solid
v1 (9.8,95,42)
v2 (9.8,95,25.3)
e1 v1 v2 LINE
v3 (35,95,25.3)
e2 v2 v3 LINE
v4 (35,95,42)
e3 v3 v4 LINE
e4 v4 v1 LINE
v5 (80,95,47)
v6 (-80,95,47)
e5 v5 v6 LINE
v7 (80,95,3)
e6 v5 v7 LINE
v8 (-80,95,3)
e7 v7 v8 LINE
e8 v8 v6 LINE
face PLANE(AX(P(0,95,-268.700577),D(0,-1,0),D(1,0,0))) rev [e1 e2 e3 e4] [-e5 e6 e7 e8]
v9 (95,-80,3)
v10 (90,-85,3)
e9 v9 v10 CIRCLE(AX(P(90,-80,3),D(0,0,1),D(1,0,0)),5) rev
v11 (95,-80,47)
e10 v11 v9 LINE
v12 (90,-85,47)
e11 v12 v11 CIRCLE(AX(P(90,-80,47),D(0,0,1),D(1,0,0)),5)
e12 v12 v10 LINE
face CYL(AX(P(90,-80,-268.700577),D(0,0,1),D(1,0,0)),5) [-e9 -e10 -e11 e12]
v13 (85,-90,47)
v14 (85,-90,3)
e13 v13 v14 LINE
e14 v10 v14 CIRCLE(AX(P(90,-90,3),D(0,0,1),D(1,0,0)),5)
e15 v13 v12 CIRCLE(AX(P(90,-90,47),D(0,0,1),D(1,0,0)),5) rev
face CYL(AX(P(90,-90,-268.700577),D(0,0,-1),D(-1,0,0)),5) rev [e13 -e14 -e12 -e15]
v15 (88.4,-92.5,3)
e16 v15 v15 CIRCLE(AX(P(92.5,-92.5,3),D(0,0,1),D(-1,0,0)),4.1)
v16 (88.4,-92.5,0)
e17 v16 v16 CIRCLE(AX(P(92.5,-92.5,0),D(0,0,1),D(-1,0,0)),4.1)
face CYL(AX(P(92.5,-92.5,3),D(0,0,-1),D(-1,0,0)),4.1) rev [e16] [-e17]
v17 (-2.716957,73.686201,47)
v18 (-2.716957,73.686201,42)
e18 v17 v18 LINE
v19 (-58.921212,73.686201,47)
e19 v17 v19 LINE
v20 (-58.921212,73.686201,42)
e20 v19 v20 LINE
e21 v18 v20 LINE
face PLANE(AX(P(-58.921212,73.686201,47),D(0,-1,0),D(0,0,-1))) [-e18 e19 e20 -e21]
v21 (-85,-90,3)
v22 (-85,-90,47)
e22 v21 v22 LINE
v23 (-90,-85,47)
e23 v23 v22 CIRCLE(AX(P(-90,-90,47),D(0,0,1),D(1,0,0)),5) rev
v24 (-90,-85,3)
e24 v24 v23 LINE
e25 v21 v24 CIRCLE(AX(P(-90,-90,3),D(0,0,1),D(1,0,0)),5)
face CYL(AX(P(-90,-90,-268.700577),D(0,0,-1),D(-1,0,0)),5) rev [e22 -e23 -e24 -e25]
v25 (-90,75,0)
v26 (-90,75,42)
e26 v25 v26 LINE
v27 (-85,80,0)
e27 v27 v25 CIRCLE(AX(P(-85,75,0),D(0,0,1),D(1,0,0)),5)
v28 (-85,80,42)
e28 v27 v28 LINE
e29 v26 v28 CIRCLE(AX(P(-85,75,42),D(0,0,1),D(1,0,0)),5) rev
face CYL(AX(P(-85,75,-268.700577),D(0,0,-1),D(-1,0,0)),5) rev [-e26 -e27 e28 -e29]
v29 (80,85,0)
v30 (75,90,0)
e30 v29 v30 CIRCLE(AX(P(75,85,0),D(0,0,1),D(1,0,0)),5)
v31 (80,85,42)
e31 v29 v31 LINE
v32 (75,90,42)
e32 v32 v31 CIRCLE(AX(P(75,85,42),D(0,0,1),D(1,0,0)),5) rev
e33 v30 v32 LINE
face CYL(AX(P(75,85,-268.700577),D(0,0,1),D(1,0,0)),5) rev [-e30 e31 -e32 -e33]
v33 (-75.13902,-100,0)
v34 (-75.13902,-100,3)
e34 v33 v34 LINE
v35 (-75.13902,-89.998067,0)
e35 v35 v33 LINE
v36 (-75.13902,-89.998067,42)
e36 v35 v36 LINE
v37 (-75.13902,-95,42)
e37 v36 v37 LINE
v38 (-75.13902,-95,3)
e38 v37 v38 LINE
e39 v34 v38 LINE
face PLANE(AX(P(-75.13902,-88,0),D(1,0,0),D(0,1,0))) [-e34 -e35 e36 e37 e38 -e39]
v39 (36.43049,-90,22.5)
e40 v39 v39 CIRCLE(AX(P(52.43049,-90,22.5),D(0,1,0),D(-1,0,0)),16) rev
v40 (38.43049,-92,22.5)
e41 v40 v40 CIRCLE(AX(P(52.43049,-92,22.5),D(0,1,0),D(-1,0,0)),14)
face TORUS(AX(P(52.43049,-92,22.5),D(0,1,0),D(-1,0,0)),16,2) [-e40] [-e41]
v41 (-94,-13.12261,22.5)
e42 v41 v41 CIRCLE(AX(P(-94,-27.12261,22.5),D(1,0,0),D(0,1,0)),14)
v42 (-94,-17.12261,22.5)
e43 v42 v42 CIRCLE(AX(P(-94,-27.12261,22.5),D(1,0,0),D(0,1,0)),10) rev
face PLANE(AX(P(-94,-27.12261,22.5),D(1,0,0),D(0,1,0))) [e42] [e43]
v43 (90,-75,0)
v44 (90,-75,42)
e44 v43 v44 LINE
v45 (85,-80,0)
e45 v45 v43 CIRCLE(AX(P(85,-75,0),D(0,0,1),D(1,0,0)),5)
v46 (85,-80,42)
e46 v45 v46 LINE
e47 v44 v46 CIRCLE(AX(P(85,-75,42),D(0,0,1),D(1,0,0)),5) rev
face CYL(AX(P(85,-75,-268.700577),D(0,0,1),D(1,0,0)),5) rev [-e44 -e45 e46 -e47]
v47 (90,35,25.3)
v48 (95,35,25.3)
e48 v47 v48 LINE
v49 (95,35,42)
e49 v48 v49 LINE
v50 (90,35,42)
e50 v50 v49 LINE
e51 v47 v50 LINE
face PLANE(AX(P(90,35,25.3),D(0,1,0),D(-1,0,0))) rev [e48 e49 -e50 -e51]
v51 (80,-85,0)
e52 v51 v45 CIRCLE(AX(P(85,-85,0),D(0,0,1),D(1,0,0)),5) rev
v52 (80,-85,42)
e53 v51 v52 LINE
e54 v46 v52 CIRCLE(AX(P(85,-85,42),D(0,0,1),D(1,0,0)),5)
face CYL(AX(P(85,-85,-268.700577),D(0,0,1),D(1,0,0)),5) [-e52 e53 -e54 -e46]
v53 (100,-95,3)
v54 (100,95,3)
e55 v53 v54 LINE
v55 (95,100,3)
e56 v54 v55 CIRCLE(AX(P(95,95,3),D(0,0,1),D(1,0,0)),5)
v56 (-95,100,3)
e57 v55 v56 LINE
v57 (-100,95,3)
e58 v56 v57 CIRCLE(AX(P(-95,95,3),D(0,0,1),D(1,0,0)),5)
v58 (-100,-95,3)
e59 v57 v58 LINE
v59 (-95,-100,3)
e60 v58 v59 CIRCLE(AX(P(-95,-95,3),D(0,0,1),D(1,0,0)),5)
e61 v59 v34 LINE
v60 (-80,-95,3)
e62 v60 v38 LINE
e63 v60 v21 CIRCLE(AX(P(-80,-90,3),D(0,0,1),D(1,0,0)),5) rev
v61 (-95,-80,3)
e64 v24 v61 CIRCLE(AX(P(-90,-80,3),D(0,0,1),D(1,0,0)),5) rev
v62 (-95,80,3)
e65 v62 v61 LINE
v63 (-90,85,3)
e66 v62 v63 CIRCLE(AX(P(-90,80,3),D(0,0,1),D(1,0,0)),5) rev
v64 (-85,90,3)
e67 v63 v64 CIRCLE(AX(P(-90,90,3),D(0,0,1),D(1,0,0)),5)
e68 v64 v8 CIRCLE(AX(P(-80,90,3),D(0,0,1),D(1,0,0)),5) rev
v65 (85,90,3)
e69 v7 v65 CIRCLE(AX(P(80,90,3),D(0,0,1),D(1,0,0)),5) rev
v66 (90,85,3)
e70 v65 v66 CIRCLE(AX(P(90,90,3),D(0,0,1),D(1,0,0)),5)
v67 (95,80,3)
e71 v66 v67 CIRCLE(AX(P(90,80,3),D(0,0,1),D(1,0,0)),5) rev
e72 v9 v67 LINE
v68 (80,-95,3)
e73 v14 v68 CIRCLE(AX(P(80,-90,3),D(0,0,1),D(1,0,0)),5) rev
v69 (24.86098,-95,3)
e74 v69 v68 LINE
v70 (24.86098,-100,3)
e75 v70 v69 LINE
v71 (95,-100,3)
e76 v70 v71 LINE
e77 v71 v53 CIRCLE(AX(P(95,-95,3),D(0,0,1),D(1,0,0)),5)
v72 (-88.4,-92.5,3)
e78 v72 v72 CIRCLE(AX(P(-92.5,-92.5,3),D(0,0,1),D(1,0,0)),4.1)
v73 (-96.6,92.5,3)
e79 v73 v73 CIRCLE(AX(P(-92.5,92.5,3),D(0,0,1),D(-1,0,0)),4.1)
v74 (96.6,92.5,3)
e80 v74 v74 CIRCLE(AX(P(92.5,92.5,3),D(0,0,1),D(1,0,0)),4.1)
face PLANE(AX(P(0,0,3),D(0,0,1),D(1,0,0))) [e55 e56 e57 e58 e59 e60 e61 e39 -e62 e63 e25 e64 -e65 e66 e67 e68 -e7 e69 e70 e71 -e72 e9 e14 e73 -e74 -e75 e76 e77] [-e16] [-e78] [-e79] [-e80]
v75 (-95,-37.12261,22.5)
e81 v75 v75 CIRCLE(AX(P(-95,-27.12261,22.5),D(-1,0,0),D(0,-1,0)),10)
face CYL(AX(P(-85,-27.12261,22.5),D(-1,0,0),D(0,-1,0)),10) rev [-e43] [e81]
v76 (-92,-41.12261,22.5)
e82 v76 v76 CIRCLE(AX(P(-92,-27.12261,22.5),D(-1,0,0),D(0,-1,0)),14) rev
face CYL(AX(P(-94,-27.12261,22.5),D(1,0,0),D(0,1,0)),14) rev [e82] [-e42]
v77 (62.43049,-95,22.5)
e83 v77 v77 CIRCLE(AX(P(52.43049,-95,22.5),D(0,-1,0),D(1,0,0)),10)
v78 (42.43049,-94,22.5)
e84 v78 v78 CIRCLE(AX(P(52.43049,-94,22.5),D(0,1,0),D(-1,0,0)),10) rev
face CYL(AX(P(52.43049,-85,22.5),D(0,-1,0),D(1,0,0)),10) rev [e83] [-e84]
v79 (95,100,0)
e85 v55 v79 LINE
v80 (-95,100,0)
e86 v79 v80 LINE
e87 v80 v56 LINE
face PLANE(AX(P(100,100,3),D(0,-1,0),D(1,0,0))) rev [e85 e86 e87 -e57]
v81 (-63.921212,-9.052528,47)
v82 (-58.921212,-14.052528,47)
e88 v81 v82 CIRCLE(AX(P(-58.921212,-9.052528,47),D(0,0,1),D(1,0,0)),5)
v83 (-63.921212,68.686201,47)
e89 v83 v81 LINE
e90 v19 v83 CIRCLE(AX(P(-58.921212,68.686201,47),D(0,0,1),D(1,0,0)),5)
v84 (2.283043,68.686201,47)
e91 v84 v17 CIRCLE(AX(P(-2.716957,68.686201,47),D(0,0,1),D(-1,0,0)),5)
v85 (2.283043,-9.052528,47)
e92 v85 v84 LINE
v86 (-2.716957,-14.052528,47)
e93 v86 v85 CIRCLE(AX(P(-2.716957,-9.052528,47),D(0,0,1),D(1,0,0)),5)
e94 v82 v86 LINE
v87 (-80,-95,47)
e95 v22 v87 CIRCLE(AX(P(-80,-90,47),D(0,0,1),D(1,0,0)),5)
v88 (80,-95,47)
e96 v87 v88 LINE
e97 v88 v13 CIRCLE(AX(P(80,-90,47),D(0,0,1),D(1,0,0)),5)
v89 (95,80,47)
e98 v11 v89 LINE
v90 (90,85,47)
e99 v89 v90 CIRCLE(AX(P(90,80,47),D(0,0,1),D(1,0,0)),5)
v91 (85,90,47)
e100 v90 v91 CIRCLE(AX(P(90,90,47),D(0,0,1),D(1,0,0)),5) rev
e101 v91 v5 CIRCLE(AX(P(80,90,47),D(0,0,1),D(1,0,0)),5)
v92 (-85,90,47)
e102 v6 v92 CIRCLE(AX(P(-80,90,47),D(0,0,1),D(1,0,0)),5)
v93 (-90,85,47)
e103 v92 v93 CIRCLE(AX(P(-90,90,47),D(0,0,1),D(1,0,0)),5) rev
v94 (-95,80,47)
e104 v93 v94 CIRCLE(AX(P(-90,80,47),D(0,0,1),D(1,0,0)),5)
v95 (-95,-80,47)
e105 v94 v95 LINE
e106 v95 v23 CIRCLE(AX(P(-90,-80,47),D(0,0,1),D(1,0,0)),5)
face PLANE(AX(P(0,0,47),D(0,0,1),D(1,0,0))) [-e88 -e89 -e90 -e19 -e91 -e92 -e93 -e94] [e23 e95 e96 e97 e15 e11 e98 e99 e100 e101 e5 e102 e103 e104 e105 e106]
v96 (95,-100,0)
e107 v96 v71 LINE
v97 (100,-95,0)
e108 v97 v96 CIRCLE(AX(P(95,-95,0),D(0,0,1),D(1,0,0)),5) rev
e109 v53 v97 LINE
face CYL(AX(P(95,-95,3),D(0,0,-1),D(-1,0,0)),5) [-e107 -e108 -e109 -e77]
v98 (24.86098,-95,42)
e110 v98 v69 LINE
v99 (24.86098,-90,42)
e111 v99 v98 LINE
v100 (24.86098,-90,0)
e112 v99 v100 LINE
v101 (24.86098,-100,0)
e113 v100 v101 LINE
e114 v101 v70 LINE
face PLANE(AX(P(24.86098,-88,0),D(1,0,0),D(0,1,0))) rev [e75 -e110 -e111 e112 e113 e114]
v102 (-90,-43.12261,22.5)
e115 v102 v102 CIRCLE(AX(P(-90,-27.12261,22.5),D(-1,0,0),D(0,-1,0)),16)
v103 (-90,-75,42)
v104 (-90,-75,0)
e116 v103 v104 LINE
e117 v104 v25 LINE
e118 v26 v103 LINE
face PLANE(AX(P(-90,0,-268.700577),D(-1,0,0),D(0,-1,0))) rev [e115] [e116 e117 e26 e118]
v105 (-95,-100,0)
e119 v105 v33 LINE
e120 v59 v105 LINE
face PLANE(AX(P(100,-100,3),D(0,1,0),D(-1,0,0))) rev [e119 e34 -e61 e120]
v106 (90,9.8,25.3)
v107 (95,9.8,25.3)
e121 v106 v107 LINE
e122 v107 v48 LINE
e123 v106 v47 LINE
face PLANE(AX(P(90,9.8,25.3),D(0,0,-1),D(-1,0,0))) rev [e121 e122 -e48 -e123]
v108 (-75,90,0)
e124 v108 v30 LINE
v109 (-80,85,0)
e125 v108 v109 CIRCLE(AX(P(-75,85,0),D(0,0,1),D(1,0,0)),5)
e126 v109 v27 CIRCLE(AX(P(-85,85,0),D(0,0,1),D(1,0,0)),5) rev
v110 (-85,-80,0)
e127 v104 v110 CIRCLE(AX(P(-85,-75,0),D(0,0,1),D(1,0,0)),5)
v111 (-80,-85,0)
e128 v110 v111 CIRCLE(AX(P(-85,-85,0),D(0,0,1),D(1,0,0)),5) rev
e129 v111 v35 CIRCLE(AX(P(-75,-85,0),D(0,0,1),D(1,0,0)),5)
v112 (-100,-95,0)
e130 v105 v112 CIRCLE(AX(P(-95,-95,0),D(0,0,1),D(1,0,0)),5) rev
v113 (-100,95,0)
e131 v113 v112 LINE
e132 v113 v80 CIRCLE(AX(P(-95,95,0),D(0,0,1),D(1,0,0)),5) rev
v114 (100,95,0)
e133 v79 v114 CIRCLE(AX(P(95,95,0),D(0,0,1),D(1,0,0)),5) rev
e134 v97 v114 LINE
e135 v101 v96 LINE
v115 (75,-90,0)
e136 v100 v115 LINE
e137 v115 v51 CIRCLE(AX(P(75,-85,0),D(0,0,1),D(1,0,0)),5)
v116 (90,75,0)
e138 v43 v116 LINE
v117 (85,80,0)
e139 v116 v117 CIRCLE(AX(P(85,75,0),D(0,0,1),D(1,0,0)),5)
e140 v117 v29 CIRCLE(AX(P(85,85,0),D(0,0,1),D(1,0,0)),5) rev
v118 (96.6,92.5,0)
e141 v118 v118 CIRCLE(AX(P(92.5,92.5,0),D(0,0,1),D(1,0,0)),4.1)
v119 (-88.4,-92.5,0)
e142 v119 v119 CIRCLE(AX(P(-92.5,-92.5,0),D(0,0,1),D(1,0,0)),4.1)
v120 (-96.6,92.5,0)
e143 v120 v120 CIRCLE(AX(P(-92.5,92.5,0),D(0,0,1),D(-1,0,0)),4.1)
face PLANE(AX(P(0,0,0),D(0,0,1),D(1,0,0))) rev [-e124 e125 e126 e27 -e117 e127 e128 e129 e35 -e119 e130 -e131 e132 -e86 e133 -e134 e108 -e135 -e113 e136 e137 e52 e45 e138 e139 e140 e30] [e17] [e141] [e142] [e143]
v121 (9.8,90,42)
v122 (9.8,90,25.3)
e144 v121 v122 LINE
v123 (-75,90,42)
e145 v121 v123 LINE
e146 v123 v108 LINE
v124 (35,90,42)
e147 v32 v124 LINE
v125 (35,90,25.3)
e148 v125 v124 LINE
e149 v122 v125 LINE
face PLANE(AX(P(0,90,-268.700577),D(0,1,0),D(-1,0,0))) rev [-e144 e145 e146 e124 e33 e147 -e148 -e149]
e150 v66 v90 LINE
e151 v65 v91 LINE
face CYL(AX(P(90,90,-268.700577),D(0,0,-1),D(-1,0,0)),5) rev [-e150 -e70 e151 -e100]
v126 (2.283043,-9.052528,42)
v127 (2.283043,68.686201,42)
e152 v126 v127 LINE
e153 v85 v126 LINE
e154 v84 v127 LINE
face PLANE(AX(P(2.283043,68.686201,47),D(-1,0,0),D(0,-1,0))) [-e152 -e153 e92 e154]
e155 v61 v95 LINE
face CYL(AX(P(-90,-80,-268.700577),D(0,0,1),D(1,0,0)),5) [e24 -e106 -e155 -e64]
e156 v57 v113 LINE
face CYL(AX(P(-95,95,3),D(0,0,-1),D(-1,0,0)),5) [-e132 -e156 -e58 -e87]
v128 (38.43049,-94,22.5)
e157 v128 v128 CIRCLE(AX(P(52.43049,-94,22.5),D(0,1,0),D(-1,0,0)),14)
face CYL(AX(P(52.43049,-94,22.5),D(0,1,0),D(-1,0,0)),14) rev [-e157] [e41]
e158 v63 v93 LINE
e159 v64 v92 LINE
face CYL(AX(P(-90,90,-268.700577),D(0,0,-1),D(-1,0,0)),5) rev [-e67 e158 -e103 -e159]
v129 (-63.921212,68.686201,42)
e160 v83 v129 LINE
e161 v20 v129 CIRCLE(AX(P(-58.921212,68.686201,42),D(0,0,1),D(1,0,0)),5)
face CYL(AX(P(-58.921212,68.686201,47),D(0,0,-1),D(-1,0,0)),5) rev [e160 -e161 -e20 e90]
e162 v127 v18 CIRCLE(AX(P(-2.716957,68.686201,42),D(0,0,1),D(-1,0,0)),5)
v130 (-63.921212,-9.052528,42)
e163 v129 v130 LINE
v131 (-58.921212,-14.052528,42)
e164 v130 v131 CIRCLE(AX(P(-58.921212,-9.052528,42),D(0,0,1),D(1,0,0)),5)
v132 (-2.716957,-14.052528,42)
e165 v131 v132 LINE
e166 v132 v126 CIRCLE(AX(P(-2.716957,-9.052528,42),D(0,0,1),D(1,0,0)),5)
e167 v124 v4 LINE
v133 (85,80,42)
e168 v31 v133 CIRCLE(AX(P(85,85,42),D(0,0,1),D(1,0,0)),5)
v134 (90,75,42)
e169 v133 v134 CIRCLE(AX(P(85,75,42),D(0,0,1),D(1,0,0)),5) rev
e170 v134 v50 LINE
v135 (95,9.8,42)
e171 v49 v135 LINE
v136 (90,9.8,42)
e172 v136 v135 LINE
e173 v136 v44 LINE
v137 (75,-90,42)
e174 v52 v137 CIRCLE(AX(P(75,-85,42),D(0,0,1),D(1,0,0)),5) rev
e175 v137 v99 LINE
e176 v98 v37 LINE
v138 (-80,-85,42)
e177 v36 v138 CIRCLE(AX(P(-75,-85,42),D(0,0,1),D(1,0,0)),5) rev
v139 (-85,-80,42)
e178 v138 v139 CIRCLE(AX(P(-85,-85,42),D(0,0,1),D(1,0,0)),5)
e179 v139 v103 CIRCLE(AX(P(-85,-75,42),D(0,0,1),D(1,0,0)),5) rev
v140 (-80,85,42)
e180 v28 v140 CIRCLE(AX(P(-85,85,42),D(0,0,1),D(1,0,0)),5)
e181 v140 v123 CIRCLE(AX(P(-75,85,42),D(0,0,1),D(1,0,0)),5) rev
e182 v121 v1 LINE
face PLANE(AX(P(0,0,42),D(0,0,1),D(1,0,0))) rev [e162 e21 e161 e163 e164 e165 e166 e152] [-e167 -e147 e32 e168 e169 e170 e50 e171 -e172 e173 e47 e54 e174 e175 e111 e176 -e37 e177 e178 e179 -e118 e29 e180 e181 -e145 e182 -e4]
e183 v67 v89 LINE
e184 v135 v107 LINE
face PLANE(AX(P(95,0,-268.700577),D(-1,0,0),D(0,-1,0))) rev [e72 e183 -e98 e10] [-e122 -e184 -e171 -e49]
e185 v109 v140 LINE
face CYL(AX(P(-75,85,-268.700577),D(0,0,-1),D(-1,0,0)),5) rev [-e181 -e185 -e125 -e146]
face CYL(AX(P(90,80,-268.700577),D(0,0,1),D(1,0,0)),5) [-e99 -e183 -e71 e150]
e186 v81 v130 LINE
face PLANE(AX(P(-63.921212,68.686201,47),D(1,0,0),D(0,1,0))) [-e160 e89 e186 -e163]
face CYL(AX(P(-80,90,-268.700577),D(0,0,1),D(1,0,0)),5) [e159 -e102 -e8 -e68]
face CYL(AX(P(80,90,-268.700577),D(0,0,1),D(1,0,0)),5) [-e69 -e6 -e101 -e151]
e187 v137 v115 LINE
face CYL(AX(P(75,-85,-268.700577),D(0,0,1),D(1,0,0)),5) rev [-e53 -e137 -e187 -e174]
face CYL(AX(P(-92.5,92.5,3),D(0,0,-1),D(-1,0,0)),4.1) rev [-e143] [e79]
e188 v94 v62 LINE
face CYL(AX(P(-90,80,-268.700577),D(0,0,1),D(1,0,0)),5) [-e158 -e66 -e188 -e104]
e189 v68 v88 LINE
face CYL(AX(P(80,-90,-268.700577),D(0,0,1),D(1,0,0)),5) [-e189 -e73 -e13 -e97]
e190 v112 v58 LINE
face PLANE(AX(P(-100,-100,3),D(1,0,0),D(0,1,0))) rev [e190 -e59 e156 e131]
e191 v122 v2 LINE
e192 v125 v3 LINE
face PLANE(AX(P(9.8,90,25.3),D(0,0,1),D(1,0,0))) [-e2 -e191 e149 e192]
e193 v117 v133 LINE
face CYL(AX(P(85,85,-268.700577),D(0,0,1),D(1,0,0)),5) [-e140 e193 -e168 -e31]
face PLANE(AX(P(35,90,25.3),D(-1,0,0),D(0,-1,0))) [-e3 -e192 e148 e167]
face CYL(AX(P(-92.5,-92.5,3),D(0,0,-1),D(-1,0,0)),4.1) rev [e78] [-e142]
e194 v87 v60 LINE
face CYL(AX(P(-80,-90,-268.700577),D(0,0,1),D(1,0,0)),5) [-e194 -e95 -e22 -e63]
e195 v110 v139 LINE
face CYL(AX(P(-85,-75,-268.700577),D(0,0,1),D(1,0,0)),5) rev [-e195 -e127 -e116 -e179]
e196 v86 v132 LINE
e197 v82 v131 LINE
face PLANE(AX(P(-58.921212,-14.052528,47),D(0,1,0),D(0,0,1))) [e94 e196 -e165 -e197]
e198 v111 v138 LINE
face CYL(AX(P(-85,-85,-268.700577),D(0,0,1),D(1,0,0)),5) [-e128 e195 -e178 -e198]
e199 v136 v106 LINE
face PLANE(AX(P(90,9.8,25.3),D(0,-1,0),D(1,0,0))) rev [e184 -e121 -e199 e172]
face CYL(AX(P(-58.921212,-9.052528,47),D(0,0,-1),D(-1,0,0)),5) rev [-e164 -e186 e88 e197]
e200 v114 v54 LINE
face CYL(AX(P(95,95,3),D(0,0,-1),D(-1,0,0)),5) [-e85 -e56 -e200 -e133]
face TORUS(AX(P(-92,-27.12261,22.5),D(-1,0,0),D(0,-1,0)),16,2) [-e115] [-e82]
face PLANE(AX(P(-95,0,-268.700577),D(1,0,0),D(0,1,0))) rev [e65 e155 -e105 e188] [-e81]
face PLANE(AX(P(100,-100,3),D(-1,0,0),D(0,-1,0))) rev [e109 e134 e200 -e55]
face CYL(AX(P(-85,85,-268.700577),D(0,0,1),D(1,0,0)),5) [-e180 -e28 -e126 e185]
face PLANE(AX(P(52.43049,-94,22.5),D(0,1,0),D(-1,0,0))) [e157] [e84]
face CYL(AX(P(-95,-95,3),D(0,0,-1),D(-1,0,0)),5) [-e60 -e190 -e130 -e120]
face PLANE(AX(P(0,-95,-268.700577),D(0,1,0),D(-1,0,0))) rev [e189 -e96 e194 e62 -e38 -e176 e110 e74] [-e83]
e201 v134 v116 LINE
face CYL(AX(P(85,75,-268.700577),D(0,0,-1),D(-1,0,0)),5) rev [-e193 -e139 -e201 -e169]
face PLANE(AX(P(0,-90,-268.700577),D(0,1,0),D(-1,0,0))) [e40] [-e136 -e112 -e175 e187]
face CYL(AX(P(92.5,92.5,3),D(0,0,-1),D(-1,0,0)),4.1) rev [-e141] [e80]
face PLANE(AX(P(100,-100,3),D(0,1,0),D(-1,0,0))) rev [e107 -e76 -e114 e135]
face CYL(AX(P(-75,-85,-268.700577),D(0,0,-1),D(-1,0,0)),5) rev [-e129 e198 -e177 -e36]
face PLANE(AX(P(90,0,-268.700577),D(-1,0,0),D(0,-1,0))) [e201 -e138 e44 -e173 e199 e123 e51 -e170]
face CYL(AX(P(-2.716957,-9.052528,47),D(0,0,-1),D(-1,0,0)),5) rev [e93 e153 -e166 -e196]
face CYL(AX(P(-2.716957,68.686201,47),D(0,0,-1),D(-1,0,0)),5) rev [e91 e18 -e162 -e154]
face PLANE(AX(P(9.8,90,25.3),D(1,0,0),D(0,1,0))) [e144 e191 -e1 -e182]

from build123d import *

# Parameters (mm, degrees)
CROQUIS1_W                   = 200
CROQUIS1_H                   = 200
CROQUIS1_R                   = 4.1
SALIENTE_EXTRUIR1_DEPTH      = 3
SALIENTE_EXTRUIR2_DEPTH      = 39
SALIENTE_EXTRUIR2_DEPTH_BACK = 3
SALIENTE_EXTRUIR3_DEPTH      = 5
REDONDEO1_R                  = 5
CROQUIS5_W                   = 100
CROQUIS5_H                   = 42
CORTAR_EXTRUIR2_DEPTH        = 12
CROQUIS6_R                   = 10
CORTAR_EXTRUIR3_DEPTH        = 10
CROQUIS7_R                   = 14
CORTAR_EXTRUIR4_DEPTH        = 4
REDONDEO2_R                  = 2
CROQUIS8_R                   = 10
CORTAR_EXTRUIR5_DEPTH        = 10
CROQUIS9_R                   = 14
CORTAR_EXTRUIR6_DEPTH        = 4
REDONDEO3_R                  = 2
CROQUIS11_W                  = 25.2
CROQUIS11_H                  = 16.7
CORTAR_EXTRUIR8_DEPTH        = 5
CROQUIS12_W                  = 25.2
CROQUIS12_H                  = 16.7
CORTAR_EXTRUIR9_DEPTH        = 5


with BuildPart() as part:
    # Croquis1 → Saliente-Extruir1 (new body)
    with BuildSketch(Plane(origin=(0, 0, 0), x_dir=(0, 1, 0), z_dir=(0, 0, 1))):
        Rectangle(CROQUIS1_W, CROQUIS1_H)
        with Locations(Location((-92.5, 92.5, 0), (0, 0, 270))):
            Circle(CROQUIS1_R, mode=Mode.SUBTRACT)
        with Locations(Location((92.5, 92.5, 0), (0, 0, 90))):
            Circle(CROQUIS1_R, mode=Mode.SUBTRACT)
        with Locations(Location((92.5, -92.5, 0), (0, 0, 270))):
            Circle(CROQUIS1_R, mode=Mode.SUBTRACT)
        with Locations(Location((-92.5, -92.5, 0), (0, 0, 90))):
            Circle(CROQUIS1_R, mode=Mode.SUBTRACT)
        Polygon((-95, 85), (-85, 85), (-85, 95), (85, 95), (85, 85), (95, 85), (95, -85), (85, -85), (85, -95), (-85, -95), (-85, -85), (-95, -85), align=None, mode=Mode.SUBTRACT)
    extrude(amount=SALIENTE_EXTRUIR1_DEPTH)

    # Croquis2 → Saliente-Extruir2 (add, two sides: drawn at the far end of the back side and taken through both)
    with BuildSketch(Plane.XY.offset(3).offset(-SALIENTE_EXTRUIR2_DEPTH_BACK)):
        Polygon((85, -85), (85, -95), (-85, -95), (-85, -85), (-95, -85), (-95, 85), (-85, 85), (-85, 95), (85, 95), (85, 85), (95, 85), (95, -85), align=None)
        Polygon((80, 90), (-80, 90), (-80, 80), (-90, 80), (-90, -80), (-80, -80), (-80, -90), (80, -90), (80, -80), (90, -80), (90, 80), (80, 80), align=None, mode=Mode.SUBTRACT)
    extrude(amount=SALIENTE_EXTRUIR2_DEPTH + SALIENTE_EXTRUIR2_DEPTH_BACK)

    # Croquis3 → Saliente-Extruir3 (add)
    with BuildSketch(Plane.XY.offset(42)):
        Polygon((85, -95), (85, -85), (95, -85), (95, 85), (85, 85), (85, 95), (-85, 95), (-85, 85), (-95, 85), (-95, -85), (-85, -85), (-85, -95), align=None)
        with BuildLine():
            Line((-58.921212306, 73.686200925), (-2.716957181, 73.686200925))
            ThreePointArc((-2.716957181, 73.686200925), (0.818576725, 72.221734831), (2.283042819, 68.686200925))
            Line((2.283042819, 68.686200925), (2.283042819, -9.052528374))
            ThreePointArc((2.283042819, -9.052528374), (0.818576725, -12.58806228), (-2.716957181, -14.052528374))
            Line((-2.716957181, -14.052528374), (-58.921212306, -14.052528374))
            ThreePointArc((-58.921212306, -14.052528374), (-62.456746212, -12.58806228), (-63.921212306, -9.052528374))
            Line((-63.921212306, -9.052528374), (-63.921212306, 68.686200925))
            ThreePointArc((-63.921212306, 68.686200925), (-62.456746212, 72.221734831), (-58.921212306, 73.686200925))
        make_face(mode=Mode.SUBTRACT)
    extrude(amount=SALIENTE_EXTRUIR3_DEPTH)

    # Redondeo1
    redondeo1_edges = [part.edges().sort_by_distance(p)[0] for p in [
        (-85, -85, 25),
        (-95, -85, 25),
        (-85, -95, 25),
        (95, -85, 25),
        (85, -85, 25),
        (85, -95, 25),
        (95, 85, 25),
        (85, 85, 25),
        (85, 95, 25),
        (-85, 85, 25),
        (-85, 95, 25),
        (-95, 85, 25),
        (100, 100, 1.5),
        (-100, 100, 1.5),
        (-100, -100, 1.5),
        (100, -100, 1.5),
        (-90, 80, 21),
        (-80, 80, 21),
        (-80, 90, 21),
        (80, 90, 21),
        (80, 80, 21),
        (90, 80, 21),
        (90, -80, 21),
        (80, -80, 21),
        (80, -90, 21),
        (-80, -90, 21),
        (-80, -80, 21),
        (-90, -80, 21),
    ]]
    fillet(redondeo1_edges, radius=REDONDEO1_R - 0.0001)  # a hair under: the kernel refuses the full size

    # Croquis5 → Cortar-Extruir2 (cut)
    with BuildSketch(Plane.XZ.offset(100)):
        with Locations((-25.139020419, 21)):
            Rectangle(CROQUIS5_W, CROQUIS5_H)
    extrude(amount=-CORTAR_EXTRUIR2_DEPTH, mode=Mode.SUBTRACT)

    # Croquis6 → Cortar-Extruir3 (cut)
    with BuildSketch(Plane.XZ.offset(95)):
        with Locations((52.430489791, 22.5)):
            Circle(CROQUIS6_R)
    extrude(amount=-CORTAR_EXTRUIR3_DEPTH, mode=Mode.SUBTRACT)

    # Croquis7 → Cortar-Extruir4 (cut)
    with BuildSketch(Plane(origin=(0, -90, 0), x_dir=(-1, 0, 0), z_dir=(0, 1, 0))):
        with Locations((-52.430489791, 22.5)):
            Circle(CROQUIS7_R)
    extrude(amount=-CORTAR_EXTRUIR4_DEPTH, mode=Mode.SUBTRACT)

    # Redondeo2
    redondeo2_edges = [part.edges().sort_by_distance(p)[0] for p in [
        (66.430489791, -90, 22.5),
    ]]
    fillet(redondeo2_edges, radius=REDONDEO2_R)

    # Croquis8 → Cortar-Extruir5 (cut)
    with BuildSketch(Plane(origin=(-95, 0, 0), x_dir=(0, -1, 0), z_dir=(-1, 0, 0))):
        with Locations((27.122609876, 22.5)):
            Circle(CROQUIS8_R)
    extrude(amount=-CORTAR_EXTRUIR5_DEPTH, mode=Mode.SUBTRACT)

    # Croquis9 → Cortar-Extruir6 (cut)
    with BuildSketch(Plane.YZ.offset(-90)):
        with Locations((-27.122609876, 22.5)):
            Circle(CROQUIS9_R)
    extrude(amount=-CORTAR_EXTRUIR6_DEPTH, mode=Mode.SUBTRACT)

    # Redondeo3
    redondeo3_edges = [part.edges().sort_by_distance(p)[0] for p in [
        (-90, -41.122609876, 22.5),
    ]]
    fillet(redondeo3_edges, radius=REDONDEO3_R)

    # Croquis11 → Cortar-Extruir8 (cut)
    with BuildSketch(Plane.XZ.offset(-95)):
        with Locations((22.4, 33.65)):
            Rectangle(CROQUIS11_W, CROQUIS11_H)
    extrude(amount=CORTAR_EXTRUIR8_DEPTH, mode=Mode.SUBTRACT)

    # Croquis12 → Cortar-Extruir9 (cut)
    with BuildSketch(Plane.YZ.offset(95)):
        with Locations((22.4, 33.65)):
            Rectangle(CROQUIS12_W, CROQUIS12_H)
    extrude(amount=-CORTAR_EXTRUIR9_DEPTH, mode=Mode.SUBTRACT)


solid = part.part
